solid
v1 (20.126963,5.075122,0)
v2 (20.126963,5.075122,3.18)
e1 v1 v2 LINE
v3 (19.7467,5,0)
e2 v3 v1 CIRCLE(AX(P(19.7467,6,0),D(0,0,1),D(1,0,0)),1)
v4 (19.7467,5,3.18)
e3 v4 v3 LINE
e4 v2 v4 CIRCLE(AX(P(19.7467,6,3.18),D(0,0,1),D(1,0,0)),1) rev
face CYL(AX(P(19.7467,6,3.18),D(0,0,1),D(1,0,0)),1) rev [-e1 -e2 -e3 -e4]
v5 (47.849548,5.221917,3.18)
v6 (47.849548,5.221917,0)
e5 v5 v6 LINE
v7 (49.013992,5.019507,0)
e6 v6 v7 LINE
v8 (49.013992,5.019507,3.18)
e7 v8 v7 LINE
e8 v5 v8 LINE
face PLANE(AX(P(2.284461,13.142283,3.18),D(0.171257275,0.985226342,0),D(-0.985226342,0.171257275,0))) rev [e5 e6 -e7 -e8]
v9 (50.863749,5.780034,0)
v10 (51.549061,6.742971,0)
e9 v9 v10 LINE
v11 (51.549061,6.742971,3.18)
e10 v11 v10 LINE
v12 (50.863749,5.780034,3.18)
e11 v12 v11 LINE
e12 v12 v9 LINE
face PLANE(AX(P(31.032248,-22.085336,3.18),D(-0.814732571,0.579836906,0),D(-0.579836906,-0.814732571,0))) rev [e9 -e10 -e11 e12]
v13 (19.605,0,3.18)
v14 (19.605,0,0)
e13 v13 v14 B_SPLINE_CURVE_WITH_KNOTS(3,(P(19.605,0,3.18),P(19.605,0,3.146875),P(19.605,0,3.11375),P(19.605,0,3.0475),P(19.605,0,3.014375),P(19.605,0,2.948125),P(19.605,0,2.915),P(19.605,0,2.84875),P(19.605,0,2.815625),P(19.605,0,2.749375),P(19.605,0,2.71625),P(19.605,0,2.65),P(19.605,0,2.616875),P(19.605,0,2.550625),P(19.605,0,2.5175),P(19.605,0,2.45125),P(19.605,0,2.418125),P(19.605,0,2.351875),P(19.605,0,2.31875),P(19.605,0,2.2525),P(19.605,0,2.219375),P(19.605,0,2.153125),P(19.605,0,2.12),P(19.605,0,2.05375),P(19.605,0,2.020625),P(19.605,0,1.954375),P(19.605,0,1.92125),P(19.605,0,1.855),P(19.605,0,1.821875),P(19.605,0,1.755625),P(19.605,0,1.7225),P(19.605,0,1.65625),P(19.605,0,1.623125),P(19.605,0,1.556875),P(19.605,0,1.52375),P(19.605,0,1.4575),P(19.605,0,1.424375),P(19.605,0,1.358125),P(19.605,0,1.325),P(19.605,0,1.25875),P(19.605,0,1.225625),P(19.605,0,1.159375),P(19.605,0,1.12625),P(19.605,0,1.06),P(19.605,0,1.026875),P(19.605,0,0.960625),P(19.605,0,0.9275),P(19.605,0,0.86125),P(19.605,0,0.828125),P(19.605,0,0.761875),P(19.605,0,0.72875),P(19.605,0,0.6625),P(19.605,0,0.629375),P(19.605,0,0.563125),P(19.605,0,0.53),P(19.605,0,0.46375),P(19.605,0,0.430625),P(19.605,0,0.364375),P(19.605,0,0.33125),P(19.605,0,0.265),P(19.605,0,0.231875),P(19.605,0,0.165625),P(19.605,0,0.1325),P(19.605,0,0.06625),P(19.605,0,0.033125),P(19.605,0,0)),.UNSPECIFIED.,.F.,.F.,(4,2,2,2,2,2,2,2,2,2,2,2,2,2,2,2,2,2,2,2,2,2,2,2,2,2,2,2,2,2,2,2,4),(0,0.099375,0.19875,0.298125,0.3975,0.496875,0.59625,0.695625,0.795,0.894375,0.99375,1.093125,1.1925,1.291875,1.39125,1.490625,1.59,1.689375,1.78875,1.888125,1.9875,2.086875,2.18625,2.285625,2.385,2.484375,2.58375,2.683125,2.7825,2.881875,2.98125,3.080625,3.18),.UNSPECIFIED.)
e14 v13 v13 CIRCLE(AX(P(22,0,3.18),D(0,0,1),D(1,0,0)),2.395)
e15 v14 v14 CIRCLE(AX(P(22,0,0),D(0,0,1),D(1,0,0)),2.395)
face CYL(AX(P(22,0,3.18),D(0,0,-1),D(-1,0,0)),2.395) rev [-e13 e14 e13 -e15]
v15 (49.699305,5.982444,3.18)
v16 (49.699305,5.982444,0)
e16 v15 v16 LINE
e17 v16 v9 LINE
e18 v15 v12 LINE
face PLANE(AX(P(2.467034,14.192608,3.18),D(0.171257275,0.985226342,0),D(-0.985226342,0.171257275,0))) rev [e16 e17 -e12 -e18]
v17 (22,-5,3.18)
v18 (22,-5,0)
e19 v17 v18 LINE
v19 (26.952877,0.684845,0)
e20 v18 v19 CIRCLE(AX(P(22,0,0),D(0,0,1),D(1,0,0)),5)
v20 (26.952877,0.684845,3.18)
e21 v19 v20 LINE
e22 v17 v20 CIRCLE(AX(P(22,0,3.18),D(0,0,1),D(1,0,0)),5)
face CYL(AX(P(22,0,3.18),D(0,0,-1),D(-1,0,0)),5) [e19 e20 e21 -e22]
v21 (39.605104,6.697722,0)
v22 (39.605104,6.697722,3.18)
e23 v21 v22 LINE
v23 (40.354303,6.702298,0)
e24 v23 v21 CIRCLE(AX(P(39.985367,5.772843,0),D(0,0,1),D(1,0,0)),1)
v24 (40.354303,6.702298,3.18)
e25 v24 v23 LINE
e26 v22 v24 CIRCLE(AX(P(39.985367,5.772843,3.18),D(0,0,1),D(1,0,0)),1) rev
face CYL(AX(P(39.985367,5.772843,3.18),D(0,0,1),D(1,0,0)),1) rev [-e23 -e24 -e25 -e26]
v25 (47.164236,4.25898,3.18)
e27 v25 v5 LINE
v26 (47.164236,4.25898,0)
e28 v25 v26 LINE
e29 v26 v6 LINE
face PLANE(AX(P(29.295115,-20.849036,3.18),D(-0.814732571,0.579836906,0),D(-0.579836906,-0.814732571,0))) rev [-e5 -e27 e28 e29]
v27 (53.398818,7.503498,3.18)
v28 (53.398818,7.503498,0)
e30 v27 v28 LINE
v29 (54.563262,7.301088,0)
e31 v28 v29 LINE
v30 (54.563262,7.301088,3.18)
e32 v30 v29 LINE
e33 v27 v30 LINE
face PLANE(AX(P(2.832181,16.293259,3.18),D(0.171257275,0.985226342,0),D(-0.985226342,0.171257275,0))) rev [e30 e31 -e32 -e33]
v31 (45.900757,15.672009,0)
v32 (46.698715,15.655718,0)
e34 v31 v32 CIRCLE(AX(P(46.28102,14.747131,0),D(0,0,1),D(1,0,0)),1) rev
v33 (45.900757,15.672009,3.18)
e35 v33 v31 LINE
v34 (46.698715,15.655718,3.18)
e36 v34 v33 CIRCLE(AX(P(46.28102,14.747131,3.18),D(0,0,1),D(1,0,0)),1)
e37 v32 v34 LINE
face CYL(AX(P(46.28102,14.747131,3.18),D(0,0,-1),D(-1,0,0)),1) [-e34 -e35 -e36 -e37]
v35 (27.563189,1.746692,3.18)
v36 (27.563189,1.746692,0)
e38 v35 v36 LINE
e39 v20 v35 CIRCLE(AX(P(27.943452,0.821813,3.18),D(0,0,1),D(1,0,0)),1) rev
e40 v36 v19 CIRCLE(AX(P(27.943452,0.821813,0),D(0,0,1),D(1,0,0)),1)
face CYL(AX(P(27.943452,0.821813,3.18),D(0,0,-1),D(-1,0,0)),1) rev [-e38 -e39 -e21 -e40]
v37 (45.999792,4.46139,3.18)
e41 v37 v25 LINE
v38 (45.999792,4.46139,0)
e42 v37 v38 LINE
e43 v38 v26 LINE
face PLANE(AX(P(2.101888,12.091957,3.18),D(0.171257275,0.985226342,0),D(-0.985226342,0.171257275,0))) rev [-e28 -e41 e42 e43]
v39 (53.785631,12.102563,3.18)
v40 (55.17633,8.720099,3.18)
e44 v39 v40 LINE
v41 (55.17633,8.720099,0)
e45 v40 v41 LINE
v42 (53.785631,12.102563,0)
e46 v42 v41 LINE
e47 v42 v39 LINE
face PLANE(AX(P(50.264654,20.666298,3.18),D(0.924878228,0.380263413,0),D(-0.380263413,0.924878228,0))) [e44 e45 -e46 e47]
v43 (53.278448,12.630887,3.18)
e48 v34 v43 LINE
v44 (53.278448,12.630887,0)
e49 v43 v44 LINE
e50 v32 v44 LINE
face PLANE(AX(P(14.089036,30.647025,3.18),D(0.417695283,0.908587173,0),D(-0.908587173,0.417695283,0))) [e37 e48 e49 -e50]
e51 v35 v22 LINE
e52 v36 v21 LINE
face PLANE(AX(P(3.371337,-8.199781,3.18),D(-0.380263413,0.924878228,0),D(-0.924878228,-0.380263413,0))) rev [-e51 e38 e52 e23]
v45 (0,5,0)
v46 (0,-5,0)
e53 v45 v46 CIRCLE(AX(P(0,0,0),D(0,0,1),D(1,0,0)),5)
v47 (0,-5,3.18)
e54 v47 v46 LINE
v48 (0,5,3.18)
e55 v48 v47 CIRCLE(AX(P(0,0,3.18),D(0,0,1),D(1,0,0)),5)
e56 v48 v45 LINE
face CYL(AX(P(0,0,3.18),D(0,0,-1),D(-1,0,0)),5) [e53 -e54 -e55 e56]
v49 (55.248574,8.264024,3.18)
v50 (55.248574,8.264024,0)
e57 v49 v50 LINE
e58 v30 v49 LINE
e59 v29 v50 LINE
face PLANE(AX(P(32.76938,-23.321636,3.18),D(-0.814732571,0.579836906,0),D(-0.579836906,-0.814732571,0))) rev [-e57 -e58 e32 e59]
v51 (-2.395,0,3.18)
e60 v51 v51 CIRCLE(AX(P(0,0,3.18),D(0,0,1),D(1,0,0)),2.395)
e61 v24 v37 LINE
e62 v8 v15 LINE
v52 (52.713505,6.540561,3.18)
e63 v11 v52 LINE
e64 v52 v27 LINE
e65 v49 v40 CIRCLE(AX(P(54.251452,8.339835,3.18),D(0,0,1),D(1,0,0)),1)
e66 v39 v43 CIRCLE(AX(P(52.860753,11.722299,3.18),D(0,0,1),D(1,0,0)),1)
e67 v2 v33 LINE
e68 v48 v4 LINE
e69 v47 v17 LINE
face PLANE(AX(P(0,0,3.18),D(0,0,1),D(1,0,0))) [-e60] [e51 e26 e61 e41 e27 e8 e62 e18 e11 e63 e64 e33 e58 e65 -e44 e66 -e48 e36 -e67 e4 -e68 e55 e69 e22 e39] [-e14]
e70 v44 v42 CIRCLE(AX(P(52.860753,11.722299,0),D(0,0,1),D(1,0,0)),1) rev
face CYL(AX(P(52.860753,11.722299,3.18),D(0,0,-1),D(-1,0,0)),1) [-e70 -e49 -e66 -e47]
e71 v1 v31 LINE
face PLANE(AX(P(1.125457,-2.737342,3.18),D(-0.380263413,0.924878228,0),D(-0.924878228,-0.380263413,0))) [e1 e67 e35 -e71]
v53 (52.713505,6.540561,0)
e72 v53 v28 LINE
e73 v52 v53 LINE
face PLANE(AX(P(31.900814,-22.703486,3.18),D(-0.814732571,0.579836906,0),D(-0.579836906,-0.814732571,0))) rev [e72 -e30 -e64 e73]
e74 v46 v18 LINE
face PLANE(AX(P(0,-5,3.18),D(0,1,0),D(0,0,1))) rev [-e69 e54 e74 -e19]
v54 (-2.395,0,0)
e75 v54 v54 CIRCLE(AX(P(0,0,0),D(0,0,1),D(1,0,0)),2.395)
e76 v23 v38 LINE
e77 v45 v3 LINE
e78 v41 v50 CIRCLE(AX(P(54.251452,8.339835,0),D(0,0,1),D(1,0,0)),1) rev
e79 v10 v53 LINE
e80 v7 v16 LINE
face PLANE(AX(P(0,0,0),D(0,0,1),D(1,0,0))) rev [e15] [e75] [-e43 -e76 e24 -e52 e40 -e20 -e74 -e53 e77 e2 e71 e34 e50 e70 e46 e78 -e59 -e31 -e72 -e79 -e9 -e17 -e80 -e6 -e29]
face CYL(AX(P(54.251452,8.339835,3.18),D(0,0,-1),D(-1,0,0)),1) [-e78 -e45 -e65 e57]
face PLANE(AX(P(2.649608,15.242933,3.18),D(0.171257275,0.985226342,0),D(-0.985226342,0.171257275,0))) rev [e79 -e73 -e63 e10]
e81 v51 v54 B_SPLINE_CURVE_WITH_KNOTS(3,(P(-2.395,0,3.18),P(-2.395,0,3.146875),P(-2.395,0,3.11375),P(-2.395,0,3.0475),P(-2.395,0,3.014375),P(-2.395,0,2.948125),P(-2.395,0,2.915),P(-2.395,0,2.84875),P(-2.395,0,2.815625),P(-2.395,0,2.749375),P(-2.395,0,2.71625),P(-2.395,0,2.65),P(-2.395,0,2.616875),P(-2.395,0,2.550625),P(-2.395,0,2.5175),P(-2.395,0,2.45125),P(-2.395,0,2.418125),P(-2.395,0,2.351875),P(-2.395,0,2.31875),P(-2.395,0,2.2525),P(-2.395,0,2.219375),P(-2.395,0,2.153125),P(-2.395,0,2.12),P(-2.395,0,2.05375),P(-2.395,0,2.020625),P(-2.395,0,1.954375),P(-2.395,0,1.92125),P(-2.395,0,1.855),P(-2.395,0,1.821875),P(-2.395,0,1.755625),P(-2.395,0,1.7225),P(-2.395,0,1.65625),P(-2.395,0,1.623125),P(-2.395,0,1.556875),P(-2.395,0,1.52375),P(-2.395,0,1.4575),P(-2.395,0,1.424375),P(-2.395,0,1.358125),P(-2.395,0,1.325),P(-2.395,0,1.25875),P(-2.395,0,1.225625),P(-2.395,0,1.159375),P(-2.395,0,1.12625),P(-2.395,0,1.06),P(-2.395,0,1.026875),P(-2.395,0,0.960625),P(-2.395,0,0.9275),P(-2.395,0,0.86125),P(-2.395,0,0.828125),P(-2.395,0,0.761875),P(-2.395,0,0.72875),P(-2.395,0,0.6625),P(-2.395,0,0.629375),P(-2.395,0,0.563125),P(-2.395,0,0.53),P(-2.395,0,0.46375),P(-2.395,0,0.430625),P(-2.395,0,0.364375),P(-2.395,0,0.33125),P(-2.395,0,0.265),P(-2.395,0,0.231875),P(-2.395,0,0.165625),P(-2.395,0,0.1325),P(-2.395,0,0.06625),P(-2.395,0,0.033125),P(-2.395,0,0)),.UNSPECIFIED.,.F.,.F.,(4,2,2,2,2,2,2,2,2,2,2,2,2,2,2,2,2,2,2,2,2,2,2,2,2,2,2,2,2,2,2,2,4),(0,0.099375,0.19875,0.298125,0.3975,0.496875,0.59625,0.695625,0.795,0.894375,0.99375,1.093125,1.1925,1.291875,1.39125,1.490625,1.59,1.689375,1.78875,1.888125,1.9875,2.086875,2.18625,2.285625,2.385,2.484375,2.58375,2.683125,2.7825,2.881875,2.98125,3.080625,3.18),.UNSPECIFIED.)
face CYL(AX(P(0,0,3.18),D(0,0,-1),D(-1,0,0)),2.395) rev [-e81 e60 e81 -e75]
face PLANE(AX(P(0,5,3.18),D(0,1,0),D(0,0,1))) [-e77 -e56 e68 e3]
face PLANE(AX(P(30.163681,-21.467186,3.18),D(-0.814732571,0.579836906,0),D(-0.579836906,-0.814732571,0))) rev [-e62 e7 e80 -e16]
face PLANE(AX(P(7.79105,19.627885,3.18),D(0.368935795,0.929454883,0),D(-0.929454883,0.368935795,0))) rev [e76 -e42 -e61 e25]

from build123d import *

# Parameters (mm, degrees)
SKETCH1_R           = 2.395
BOSS_EXTRUDE1_DEPTH = 3.18
FILLET1_R           = 1


with BuildPart() as part:
    # Sketch1 → Boss-Extrude1 (new body)
    # profile 1 of 2: a face of its own
    with BuildSketch(Plane.XY):
        with BuildLine():
            Line((46.303280967, 15.837507263), (19.944251464, 5))
            Line((19.944251464, 5), (22, 5))
            ThreePointArc((22, 5), (24.987746861, 4.009160597), (26.791342796, 1.429347478))
            Line((26.791342796, 1.429347478), (39.978778977, 6.851358003))
            Line((39.978778977, 6.851358003), (45.999791823, 4.461390287))
            Line((45.999791823, 4.461390287), (47.164236001, 4.258980416))
            Line((47.164236001, 4.258980416), (47.849548279, 5.221917112))
            Line((47.849548279, 5.221917112), (49.013992457, 5.019507241))
            Line((49.013992457, 5.019507241), (49.699304735, 5.982443937))
            Line((49.699304735, 5.982443937), (50.863748914, 5.780034066))
            Line((50.863748914, 5.780034066), (51.549061192, 6.742970763))
            Line((51.549061192, 6.742970763), (52.71350537, 6.540560892))
            Line((52.71350537, 6.540560892), (53.398817648, 7.503497588))
            Line((53.398817648, 7.503497588), (54.563261826, 7.301087717))
            Line((54.563261826, 7.301087717), (55.248574104, 8.264024414))
            Line((55.248574104, 8.264024414), (55.347176821, 8.304564892))
            Line((55.347176821, 8.304564892), (53.635991464, 12.466516919))
            Line((53.635991464, 12.466516919), (46.303280967, 15.837507263))
        make_face()
    # profile 2 of 2: a face of its own
    with BuildSketch(Plane.XY):
        with BuildLine():
            ThreePointArc((22, -5), (27, 0), (22, 5))
            Line((22, 5), (0, 5))
            ThreePointArc((0, 5), (-5, 0), (0, -5))
            Line((0, -5), (22, -5))
        make_face()
        with Locations(Location((22, 0, 0), (0, 0, 180))):
            Circle(SKETCH1_R, mode=Mode.SUBTRACT)
        with Locations(Location((0, 0, 0), (0, 0, 180))):
            Circle(SKETCH1_R, mode=Mode.SUBTRACT)
    extrude(amount=BOSS_EXTRUDE1_DEPTH)

    # Fillet1
    # the kernel refuses this fillet: 1 mm, written as the material it adds along each edge
    with BuildSketch(Plane(origin=(39.978778977, 6.851358003, 0), x_dir=(-0.9248782281665482, -0.3802634127332084, 0), z_dir=(0, 0, 1))) as fillet1_piece_1:
        with BuildLine():
            CenterArc((FILLET1_R * 0.404026225835, FILLET1_R), FILLET1_R, 226, 44)
            Line((-FILLET1_R * 0.290632144624, FILLET1_R * 0.280660199661), (0, 0))
            Line((0, 0), (FILLET1_R * 0.404026225835, 0))
        make_face()
    extrude(amount=3.18)
    with BuildSketch(Plane(origin=(26.791342796, 1.429347478, 0), x_dir=(0.9248782281665486, 0.38026341273320724, 0), z_dir=(0, 0, 1))) as fillet1_piece_2:
        with BuildLine():
            CenterArc((0.834537834, -1), FILLET1_R, 90, 75.522487814)
            ThreePointArc((-0.133708003, -0.75), (-0.052548991, -0.377550259), (0, 0))
            Line((0, 0), (0.834537834, 0))
        make_face()
    extrude(amount=3.18)
    with BuildSketch(Plane(origin=(19.944251464, 5, 0), x_dir=(0.9248782281665495, 0.3802634127332051, 0), z_dir=(0, 0, 1))) as fillet1_piece_3:
        with BuildLine():
            CenterArc((FILLET1_R * 0.197551931945, FILLET1_R), FILLET1_R, 247.65, 22.35)
            Line((-FILLET1_R * 0.182711480788, FILLET1_R * 0.0751217718334), (0, 0))
            Line((0, 0), (FILLET1_R * 0.197551931945, 0))
        make_face()
    extrude(amount=3.18)
    # the kernel refuses this fillet: 1 mm, written as the material it takes off along each edge
    with BuildSketch(Plane(origin=(46.303280967, 15.837507263, -1.088047115), x_dir=(-0.9248782281665417, -0.38026341273322406, 0), z_dir=(0, 0, 1))) as fillet1_2_piece_1:
        with BuildLine():
            CenterArc((FILLET1_R * 0.43521884585, FILLET1_R), FILLET1_R, 222.960833652, 47.039166348)
            Line((-FILLET1_R * 0.296600886481, FILLET1_R * 0.318501739275), (0, 0))
            Line((0, 0), (FILLET1_R * 0.43521884585, 0))
        make_face()
    extrude(amount=5.356094229, mode=Mode.SUBTRACT)
    with BuildSketch(Plane(origin=(53.635991464, 12.466516919, -0.983789259), x_dir=(-0.9085871727996149, 0.41769528298031194, 0), z_dir=(0, 0, 1))) as fillet1_2_piece_2:
        with BuildLine():
            CenterArc((FILLET1_R * 0.393515703744, FILLET1_R), FILLET1_R, 227.039166348, 42.960833652)
            Line((-FILLET1_R * 0.287982556982, FILLET1_R * 0.268180267669), (0, 0))
            Line((0, 0), (FILLET1_R * 0.393515703744, 0))
        make_face()
    extrude(amount=5.147578519, mode=Mode.SUBTRACT)
    with BuildSketch(Plane(origin=(55.347176821, 8.304564892, -1.123212767), x_dir=(-0.9248782281666527, -0.38026341273295444, 0), z_dir=(0, 0, 1))) as fillet1_2_piece_3:
        with BuildLine():
            CenterArc((1, -0.449285107), FILLET1_R, 153.302173601, 26.697826399)
            Line((0, -0.449285107), (0, 0))
            Line((0, 0), (0.106611567, 0))
        make_face()
    extrude(amount=5.426425535, mode=Mode.SUBTRACT)


solid = part.part
